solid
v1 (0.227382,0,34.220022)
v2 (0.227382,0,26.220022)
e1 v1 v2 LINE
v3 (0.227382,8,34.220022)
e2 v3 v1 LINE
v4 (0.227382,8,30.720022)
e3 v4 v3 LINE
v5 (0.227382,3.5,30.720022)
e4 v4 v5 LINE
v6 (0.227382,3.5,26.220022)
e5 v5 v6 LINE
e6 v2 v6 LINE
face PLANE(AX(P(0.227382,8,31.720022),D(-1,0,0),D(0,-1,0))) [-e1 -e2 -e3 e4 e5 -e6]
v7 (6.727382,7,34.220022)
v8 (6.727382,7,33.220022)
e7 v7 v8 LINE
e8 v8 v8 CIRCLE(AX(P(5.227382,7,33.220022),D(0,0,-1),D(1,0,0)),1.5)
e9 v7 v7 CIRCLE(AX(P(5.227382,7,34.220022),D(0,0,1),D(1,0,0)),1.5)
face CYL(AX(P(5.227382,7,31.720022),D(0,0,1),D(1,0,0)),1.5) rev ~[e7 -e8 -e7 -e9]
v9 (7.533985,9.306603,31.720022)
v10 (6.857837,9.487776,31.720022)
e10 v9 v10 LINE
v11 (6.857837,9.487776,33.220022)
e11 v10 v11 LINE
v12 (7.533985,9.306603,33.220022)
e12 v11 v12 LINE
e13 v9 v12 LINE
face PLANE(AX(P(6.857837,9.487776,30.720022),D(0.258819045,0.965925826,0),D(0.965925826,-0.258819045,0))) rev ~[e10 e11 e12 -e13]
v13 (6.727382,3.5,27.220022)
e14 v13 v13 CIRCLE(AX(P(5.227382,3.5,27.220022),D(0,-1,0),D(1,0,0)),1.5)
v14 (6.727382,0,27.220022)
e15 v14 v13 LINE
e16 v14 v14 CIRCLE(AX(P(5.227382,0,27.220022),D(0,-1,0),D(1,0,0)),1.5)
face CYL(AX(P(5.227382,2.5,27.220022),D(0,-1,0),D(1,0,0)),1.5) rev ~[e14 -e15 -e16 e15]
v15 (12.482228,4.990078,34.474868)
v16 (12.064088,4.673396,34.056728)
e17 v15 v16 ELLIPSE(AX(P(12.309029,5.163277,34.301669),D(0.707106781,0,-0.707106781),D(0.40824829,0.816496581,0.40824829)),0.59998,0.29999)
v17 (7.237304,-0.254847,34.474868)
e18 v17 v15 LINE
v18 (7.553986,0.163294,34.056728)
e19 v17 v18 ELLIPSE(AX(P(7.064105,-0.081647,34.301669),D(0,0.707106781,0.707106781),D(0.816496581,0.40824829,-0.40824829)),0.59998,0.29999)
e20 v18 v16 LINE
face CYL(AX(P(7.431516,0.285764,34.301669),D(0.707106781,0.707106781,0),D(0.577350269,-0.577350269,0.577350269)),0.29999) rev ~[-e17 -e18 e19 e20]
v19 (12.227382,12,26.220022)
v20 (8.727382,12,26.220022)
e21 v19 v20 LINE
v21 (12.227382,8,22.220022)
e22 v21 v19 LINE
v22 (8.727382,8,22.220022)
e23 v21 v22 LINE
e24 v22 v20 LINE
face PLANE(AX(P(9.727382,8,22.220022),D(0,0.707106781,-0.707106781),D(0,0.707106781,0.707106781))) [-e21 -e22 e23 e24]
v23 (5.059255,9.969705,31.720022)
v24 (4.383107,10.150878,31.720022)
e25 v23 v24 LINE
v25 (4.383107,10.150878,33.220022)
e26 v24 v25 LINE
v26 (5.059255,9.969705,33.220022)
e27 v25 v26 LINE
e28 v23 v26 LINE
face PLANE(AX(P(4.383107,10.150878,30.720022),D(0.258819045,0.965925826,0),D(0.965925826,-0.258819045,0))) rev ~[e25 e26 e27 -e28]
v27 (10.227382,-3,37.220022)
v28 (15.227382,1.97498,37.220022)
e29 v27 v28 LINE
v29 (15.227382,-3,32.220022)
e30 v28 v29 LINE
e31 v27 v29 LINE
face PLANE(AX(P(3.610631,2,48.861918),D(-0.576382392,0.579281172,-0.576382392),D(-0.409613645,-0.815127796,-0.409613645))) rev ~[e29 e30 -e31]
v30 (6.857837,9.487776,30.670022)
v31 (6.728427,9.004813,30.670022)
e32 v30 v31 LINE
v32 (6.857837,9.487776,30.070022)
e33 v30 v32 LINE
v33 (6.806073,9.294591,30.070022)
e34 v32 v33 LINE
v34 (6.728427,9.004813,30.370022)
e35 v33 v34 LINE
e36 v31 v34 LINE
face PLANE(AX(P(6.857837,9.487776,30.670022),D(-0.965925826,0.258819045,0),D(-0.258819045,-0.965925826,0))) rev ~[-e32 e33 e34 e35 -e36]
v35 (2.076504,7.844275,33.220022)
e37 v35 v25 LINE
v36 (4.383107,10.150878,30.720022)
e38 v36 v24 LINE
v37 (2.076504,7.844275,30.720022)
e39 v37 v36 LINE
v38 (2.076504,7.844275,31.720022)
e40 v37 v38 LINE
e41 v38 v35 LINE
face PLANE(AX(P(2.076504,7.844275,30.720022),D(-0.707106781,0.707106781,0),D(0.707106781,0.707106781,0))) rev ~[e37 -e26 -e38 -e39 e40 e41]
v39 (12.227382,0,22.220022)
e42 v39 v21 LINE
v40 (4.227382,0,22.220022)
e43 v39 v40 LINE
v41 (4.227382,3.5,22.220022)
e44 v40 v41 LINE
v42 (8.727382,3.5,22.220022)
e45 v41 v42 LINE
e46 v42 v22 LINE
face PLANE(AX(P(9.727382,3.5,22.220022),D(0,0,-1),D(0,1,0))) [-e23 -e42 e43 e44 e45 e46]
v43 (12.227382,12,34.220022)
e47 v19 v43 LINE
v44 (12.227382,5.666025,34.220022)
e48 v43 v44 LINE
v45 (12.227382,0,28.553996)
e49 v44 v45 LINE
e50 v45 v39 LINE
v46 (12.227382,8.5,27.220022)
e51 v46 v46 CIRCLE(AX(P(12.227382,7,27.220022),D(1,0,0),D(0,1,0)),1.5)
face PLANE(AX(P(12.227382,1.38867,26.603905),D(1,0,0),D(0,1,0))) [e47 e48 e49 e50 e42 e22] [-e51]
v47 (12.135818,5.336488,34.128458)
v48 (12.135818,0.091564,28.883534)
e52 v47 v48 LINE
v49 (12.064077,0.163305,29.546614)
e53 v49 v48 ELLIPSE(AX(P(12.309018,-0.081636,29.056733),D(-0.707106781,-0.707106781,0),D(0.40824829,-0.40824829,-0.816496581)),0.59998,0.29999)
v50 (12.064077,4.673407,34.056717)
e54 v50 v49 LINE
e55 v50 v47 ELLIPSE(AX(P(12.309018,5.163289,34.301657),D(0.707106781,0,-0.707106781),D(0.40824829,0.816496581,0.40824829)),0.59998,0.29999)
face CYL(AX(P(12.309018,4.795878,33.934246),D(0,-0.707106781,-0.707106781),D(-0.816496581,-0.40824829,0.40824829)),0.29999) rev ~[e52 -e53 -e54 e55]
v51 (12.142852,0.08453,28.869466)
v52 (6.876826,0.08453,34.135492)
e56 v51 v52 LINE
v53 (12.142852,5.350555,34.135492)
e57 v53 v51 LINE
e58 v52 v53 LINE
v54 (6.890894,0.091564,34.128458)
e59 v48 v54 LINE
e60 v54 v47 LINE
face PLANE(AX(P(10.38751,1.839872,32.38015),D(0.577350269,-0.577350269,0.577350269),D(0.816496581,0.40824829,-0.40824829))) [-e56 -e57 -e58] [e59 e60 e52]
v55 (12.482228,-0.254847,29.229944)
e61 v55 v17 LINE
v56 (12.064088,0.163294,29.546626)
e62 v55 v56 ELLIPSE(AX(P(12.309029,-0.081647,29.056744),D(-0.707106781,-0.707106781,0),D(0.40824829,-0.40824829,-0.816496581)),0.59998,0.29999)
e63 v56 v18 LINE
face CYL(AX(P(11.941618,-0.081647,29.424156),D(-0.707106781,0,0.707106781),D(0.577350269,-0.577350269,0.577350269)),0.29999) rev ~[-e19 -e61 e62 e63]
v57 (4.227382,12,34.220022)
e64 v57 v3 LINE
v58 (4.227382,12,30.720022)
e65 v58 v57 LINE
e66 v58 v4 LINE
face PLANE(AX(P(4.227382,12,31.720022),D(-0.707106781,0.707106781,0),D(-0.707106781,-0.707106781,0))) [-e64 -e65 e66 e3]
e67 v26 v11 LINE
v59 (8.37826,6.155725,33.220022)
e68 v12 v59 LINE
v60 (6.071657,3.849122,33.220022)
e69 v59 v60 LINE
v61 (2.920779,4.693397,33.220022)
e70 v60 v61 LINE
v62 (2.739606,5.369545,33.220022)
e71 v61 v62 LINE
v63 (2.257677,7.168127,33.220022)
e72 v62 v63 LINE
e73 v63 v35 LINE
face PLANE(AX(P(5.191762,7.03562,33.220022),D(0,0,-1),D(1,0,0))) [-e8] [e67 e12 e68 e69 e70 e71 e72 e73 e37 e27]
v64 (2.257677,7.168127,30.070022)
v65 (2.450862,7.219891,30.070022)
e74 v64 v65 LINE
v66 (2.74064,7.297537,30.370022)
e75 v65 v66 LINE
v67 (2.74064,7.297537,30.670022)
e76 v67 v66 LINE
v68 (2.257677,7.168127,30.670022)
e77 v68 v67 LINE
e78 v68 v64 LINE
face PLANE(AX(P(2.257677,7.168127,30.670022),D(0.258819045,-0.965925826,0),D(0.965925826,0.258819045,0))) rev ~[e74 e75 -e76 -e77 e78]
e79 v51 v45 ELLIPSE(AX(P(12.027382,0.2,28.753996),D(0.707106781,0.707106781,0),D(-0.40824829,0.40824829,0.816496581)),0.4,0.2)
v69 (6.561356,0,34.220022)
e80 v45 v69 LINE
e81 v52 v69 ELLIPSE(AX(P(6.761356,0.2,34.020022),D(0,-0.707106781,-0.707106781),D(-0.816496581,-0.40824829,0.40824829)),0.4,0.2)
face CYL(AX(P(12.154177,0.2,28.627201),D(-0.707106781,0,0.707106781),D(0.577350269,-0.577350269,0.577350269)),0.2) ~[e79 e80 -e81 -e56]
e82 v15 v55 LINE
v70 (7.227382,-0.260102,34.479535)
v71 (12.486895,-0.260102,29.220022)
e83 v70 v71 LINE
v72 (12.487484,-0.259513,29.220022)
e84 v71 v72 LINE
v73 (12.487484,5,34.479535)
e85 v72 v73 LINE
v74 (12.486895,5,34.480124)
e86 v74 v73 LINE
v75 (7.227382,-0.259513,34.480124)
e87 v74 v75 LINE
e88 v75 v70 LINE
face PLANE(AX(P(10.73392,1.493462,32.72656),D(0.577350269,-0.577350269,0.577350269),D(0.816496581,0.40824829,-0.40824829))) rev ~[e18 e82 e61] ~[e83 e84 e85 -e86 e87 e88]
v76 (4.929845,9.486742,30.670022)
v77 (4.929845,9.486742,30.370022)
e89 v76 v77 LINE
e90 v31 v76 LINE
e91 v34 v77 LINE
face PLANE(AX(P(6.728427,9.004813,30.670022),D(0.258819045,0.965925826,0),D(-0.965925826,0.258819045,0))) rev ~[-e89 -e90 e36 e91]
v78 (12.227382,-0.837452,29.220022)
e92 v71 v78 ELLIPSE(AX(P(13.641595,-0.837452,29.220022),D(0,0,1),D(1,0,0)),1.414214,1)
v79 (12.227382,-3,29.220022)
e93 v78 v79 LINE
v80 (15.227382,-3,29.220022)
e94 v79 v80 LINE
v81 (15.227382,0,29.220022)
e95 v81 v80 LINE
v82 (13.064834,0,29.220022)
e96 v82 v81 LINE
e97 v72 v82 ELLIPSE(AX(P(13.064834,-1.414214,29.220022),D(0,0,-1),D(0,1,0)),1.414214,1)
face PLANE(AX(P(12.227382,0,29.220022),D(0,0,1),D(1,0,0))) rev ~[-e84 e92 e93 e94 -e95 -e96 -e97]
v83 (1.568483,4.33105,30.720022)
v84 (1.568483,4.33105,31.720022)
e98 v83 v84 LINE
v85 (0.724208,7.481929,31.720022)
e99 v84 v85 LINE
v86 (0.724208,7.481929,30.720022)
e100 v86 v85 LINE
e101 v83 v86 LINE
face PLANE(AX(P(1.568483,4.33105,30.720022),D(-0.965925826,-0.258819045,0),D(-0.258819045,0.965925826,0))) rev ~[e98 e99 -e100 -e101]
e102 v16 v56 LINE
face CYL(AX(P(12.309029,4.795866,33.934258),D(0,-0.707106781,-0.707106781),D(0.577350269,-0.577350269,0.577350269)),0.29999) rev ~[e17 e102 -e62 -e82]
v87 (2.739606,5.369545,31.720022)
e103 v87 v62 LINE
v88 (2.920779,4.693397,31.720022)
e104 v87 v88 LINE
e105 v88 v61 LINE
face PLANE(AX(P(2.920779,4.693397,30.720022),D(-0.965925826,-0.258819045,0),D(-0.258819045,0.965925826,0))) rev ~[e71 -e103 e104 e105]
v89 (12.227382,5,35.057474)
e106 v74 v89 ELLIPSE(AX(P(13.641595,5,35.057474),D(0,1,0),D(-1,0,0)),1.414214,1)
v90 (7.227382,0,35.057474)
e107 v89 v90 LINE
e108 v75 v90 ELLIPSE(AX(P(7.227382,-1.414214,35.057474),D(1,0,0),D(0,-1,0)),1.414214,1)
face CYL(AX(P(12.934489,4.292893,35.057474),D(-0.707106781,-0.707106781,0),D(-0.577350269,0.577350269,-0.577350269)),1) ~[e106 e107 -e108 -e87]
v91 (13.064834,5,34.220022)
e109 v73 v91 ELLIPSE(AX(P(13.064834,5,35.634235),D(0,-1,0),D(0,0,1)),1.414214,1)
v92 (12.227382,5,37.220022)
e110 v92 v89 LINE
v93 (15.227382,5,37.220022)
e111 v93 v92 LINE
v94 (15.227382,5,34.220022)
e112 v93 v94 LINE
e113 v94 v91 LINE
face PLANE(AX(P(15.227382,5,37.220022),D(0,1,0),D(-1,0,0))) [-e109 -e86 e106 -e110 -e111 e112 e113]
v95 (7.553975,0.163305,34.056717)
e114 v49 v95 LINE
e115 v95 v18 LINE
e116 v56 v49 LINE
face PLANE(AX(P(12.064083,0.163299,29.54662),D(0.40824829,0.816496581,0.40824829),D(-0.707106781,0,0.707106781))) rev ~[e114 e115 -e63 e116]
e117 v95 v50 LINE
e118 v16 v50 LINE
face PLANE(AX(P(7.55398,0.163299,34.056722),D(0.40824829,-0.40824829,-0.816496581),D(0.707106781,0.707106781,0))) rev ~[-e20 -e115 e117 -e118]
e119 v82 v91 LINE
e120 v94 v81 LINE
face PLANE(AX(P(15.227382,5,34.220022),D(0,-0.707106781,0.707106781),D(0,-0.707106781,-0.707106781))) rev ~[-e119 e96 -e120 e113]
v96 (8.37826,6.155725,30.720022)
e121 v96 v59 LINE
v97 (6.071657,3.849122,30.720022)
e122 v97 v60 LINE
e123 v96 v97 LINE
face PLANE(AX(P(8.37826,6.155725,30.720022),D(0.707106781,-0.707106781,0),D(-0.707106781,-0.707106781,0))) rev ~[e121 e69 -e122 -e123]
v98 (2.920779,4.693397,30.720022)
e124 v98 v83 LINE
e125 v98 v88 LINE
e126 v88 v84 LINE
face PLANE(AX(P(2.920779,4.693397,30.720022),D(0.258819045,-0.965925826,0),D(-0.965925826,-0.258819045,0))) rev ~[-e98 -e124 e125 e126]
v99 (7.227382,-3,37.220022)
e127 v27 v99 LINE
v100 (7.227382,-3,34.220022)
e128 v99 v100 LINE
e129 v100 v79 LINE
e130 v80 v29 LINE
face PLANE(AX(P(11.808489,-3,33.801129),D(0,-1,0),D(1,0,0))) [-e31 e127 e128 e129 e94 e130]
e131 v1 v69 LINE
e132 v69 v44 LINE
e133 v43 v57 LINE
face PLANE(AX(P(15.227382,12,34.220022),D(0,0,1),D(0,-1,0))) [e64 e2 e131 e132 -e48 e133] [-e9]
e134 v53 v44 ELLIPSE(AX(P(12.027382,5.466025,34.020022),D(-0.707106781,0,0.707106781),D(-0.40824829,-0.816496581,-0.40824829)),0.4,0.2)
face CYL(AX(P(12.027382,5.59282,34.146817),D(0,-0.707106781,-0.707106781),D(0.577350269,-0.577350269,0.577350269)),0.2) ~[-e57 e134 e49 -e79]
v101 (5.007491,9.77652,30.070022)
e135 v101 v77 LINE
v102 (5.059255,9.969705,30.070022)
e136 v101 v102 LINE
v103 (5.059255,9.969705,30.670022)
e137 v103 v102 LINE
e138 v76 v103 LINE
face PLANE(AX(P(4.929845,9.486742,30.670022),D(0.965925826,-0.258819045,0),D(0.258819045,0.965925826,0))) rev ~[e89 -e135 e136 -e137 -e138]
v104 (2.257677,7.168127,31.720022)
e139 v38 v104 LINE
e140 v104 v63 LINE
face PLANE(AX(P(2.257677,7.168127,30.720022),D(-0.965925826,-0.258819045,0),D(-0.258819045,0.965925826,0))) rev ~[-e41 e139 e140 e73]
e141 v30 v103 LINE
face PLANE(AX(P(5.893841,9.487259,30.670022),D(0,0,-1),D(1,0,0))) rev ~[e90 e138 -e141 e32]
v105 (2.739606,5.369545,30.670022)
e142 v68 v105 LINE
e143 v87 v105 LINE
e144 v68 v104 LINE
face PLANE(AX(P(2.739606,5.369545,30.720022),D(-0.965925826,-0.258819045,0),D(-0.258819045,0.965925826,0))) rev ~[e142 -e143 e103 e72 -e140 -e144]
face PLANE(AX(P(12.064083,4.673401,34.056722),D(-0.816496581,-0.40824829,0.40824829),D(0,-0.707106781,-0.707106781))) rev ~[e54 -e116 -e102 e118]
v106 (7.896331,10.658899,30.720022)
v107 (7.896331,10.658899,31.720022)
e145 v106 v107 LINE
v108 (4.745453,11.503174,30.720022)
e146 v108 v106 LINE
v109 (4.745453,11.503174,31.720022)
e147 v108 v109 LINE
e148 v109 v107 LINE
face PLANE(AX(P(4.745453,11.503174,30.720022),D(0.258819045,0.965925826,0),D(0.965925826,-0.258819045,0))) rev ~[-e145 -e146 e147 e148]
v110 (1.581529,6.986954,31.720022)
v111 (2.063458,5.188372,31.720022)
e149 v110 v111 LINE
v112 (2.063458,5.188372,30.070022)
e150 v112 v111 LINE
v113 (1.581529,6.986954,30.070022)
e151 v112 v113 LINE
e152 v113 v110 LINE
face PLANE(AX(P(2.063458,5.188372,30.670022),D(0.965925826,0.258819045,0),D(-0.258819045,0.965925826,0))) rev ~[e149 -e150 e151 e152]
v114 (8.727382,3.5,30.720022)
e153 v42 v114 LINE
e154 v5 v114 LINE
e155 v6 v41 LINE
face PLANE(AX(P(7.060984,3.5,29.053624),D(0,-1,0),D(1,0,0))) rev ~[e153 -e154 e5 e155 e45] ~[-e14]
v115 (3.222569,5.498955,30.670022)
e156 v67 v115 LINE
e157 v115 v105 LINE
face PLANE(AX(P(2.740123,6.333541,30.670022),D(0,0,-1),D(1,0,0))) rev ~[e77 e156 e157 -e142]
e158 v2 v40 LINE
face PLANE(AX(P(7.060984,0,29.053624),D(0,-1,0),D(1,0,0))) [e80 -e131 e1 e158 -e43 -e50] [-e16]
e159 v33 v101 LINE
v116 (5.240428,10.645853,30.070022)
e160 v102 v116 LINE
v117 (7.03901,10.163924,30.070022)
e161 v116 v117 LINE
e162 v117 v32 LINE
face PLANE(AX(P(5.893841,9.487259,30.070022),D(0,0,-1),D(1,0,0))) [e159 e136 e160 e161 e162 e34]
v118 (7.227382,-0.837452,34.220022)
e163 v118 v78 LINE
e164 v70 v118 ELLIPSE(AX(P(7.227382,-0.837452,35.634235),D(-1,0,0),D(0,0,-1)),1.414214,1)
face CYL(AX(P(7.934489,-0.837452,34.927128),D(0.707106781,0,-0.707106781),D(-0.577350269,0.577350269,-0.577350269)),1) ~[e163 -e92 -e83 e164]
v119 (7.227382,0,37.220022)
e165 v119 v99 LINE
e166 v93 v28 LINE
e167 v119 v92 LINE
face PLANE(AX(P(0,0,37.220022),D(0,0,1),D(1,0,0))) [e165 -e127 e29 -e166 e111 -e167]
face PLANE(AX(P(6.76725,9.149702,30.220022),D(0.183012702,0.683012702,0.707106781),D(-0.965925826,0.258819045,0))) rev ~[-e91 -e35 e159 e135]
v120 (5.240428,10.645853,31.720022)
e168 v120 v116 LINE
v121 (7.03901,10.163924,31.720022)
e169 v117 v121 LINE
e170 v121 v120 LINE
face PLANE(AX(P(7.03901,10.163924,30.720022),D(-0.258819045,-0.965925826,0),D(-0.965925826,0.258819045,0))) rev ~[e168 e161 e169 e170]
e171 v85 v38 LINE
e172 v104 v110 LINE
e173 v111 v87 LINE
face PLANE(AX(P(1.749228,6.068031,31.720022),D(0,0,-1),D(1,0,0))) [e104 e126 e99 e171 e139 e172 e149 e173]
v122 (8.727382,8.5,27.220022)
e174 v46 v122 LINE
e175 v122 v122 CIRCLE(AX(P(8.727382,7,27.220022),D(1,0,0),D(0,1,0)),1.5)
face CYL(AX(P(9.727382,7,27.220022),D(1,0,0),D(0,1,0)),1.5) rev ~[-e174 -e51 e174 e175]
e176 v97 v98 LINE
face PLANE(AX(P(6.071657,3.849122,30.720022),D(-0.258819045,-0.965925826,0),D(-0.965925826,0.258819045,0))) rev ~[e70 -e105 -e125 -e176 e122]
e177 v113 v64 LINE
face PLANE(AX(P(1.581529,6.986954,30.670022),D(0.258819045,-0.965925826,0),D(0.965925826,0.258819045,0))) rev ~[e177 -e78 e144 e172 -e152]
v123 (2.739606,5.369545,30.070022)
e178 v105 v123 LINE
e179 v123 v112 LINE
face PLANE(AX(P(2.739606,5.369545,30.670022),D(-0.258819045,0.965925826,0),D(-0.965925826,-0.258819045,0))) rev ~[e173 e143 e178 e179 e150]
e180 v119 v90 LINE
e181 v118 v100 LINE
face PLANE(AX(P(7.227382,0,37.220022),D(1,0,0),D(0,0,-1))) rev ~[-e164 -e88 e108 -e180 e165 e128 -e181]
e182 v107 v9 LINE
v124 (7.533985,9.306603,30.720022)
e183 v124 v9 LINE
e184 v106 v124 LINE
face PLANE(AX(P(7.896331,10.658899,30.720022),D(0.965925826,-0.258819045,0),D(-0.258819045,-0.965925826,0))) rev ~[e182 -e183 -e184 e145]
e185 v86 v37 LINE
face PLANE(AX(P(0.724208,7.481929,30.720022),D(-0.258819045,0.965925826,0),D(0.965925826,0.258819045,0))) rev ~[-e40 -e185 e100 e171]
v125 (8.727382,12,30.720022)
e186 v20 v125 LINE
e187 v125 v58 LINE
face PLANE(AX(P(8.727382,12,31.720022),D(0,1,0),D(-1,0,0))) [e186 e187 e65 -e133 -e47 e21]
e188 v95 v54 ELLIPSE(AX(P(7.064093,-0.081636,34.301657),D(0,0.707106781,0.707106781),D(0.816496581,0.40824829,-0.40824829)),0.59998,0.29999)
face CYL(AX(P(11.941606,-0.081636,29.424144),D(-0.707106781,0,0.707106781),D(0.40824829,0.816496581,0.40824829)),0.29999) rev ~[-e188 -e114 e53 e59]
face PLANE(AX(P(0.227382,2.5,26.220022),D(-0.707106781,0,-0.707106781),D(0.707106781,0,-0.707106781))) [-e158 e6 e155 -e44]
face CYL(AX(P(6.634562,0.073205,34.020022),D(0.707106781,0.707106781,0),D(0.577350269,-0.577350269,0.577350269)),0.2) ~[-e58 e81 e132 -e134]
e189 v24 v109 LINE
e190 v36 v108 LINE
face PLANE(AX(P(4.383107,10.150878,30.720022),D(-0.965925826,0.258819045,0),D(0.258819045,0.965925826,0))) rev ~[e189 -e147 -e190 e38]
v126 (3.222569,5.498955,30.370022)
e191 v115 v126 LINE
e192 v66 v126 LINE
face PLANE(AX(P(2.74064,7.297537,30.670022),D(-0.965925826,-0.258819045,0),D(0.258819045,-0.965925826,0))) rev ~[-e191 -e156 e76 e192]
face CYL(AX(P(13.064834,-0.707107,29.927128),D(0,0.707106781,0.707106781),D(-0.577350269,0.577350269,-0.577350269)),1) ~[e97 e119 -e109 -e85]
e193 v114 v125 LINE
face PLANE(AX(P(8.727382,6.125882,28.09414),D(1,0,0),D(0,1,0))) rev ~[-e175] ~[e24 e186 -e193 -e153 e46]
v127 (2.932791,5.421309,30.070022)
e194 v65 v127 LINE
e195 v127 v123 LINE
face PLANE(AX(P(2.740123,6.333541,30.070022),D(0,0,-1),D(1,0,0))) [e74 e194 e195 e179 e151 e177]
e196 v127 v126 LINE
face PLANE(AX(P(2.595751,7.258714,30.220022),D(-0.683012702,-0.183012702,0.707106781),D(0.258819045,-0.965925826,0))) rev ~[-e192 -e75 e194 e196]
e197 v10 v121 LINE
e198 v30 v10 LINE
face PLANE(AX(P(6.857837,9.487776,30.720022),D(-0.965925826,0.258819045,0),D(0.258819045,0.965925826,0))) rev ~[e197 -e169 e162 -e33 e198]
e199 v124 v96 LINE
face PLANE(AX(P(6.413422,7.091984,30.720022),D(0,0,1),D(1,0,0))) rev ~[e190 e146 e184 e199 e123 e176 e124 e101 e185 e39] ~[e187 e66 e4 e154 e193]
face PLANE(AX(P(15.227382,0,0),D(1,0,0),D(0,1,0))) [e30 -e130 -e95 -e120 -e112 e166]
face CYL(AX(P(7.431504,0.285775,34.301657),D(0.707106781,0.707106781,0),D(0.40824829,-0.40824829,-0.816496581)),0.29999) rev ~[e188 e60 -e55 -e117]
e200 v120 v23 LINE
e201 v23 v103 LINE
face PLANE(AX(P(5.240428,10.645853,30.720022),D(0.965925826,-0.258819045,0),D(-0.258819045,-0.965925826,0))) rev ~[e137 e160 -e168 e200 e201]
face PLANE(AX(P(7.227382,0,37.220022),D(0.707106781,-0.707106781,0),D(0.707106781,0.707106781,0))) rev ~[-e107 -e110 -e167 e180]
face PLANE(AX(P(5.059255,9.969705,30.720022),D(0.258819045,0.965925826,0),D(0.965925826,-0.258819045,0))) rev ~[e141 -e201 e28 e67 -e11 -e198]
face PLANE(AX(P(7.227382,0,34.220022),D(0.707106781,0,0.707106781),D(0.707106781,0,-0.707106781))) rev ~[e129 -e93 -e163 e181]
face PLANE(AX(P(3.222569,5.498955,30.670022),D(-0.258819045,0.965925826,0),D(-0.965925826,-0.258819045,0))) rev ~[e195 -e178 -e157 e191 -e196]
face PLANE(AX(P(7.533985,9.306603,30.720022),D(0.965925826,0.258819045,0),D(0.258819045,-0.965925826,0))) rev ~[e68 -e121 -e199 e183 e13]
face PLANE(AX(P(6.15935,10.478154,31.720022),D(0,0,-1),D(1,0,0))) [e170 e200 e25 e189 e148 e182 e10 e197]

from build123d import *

# Parameters (mm, degrees)
F1_DEPTH     = 3
F0_R         = 1.5
F2_DEPTH     = 2.5
F3_R         = 1.5
F4_DEPTH     = 5.5
F5_DEPTH     = 3
F6_R         = 1.5
F7_DEPTH     = 5.5
F8_DEPTH     = 3
F10_DEPTH    = 5
F11_T4_DEPTH = 32.8926942089
F14_DEPTH    = 0.3
F15_R        = 0.29999
F16_R        = 1
F17_R        = 0.2
F18_DEPTH    = 1
F19_DEPTH    = 1
F20_DEPTH    = 1
F21_R        = 1.5
F22_DEPTH    = 2.5
F23_DEPTH    = 1
F24_DEPTH    = 0.05
F26_DEPTH    = 0.6
F27_SIZE     = 0.3


# Not quite as in the source:
# - a fillet or chamfer that OpenCascade refuses, or shapes differently, is made with other operations: its cross-section is extruded or revolved along the edge and cut away or added
# - a fillet or chamfer is up to 0.001 mm smaller than in the source, because OpenCascade refuses the exact size


with BuildPart() as f1:
    # F0 (on Front) → F1 (new body)
    with BuildSketch(Plane.XZ):
        Polygon((15.2273818341, 37.2200216049), (7.2273818341, 37.2200216049), (7.2273818341, 34.2200216049), (12.2273818341, 29.2200216049), (15.2273818341, 29.2200216049), align=None)
    extrude(amount=F1_DEPTH)

    # F0 (on Front) → F2 (join)
    with BuildSketch(Plane.XZ):
        Polygon((7.2273818341, 34.2200216049), (7.2273818341, 37.2200216049), (0.2273818341, 37.2200216049), (0.2273818341, 26.2200216049), (4.2273818341, 22.2200216049), (15.2273818341, 22.2200216049), (15.2273818341, 29.2200216049), (12.2273818341, 29.2200216049), align=None)
        with Locations((5.2273818341, 27.2200216049)):
            Circle(F0_R, mode=Mode.SUBTRACT)
        Polygon((15.2273818341, 37.2200216049), (7.2273818341, 37.2200216049), (7.2273818341, 34.2200216049), (12.2273818341, 29.2200216049), (15.2273818341, 29.2200216049), align=None)
    extrude(amount=-F2_DEPTH)

    # F3 (on face) → F4 (join)
    with BuildSketch(Plane.XY.offset(37.2200216049)):
        Polygon((0.2273818341, 2.5), (9.7273818341, 2.5), (12.2273818341, 5), (12.2273818341, 12), (4.2273818341, 12), (0.2273818341, 8), align=None)
        with Locations((5.2273818341, 7)):
            Circle(F3_R, mode=Mode.SUBTRACT)
        Polygon((9.7273818341, 2.5), (15.2273818341, 2.5), (15.2273818341, 5), (12.2273818341, 5), align=None)
    extrude(amount=-F4_DEPTH)

    # F3 (on face) → F5 (cut)
    with BuildSketch(Plane.XY.offset(37.2200216049)):
        Polygon((0.2273818341, 2.5), (9.7273818341, 2.5), (12.2273818341, 5), (12.2273818341, 12), (4.2273818341, 12), (0.2273818341, 8), align=None)
        with Locations((5.2273818341, 7)):
            Circle(F3_R, mode=Mode.SUBTRACT)
        Polygon((0.2273818341, 0), (7.2273818341, 0), (9.7273818341, 2.5), (0.2273818341, 2.5), align=None)
    extrude(amount=-F5_DEPTH, mode=Mode.SUBTRACT)

    # F6 (on face) → F7 (join)
    with BuildSketch(Plane.YZ.offset(15.2273818341)):
        Polygon((5, 34.2200216049), (0, 29.2200216049), (0, 22.2200216049), (8, 22.2200216049), (12, 26.2200216049), (12, 34.2200216049), align=None)
        with Locations((7, 27.2200216049)):
            Circle(F6_R, mode=Mode.SUBTRACT)
    extrude(amount=-F7_DEPTH)

    # F6 (on face) → F8 (cut)
    with BuildSketch(Plane.YZ.offset(15.2273818341)):
        Polygon((2.5, 31.7200216049), (0, 29.2200216049), (0, 22.2200216049), (2.5, 22.2200216049), align=None)
        Polygon((5, 31.7200216049), (2.5, 31.7200216049), (2.5, 22.2200216049), (8, 22.2200216049), (12, 26.2200216049), (12, 34.2200216049), (5, 34.2200216049), align=None)
        with Locations((7, 27.2200216049)):
            Circle(F6_R, mode=Mode.SUBTRACT)
        Polygon((5, 34.2200216049), (2.5, 31.7200216049), (5, 31.7200216049), align=None)
    extrude(amount=-F8_DEPTH, mode=Mode.SUBTRACT)

    # F9 (on face) → F10 (cut)
    with BuildSketch(Plane.XZ.offset(3)):
        Polygon((15.2273818341, 32.2200216049), (15.2273818341, 37.2200216049), (10.2273818341, 37.2200216049), align=None)
    extrude(amount=-F10_DEPTH, mode=Mode.SUBTRACT)

    # F11: chamfer of 5 x 3.5533150469 on 1 edges, made by hand


with BuildPart() as f11_tool2:
    # F11_s3 → F11_t4 (new body)
    with BuildSketch(Plane(origin=(-22.6256434487, 0, 22.6256434487), x_dir=(0, 1, 0), z_dir=(0.7071067812, 0, -0.7071067812))):
        Polygon((2, 37.1036957683), (-3, 33.5503807214), (2, 33.5503807214), align=None)
    extrude(amount=F11_T4_DEPTH)

    split(bisect_by=Plane.YZ.offset(15.2273818341), keep=Keep.BOTTOM)

    split(bisect_by=Plane.XZ.offset(3), keep=Keep.BOTTOM)

    split(bisect_by=Plane.XY.offset(37.2200216049), keep=Keep.BOTTOM)


with BuildPart() as f1_1:
    add(f1.part)

    # F11_t1: union F11_tool2
    add(f11_tool2.part)

    # F13 (on 3pt) → F14 (cut, symmetric)
    with BuildSketch(Plane(origin=(13.8158011463, -13.8158011463, 13.8158011463), x_dir=(0.8164965809, 0.4082482905, -0.4082482905), z_dir=(0.5773502692, -0.5773502692, 0.5773502692))):
        Polygon((-1.0654091424, 19.1374719877), (-1.0654091424, 29.2569466706), (-9.8291312908, 24.1972093292), align=None)
        Polygon((-1.9454084062, 20.6616754232), (-8.0691327632, 24.1972093292), (-1.9454084062, 27.7327432351), align=None, mode=Mode.SUBTRACT)
        Polygon((-1.9454084062, 27.7327432351), (-8.0691327632, 24.1972093292), (-1.9454084062, 20.6616754232), align=None)
        Polygon((-7.6691327632, 24.1972093292), (-2.1454084062, 27.3863330736), (-2.1454084062, 21.0080855847), align=None, mode=Mode.SUBTRACT)
    extrude(amount=F14_DEPTH, both=True, mode=Mode.SUBTRACT)

    # F15 (radius 0.3 in the source; OpenCascade refuses exactly that, so slightly less here)
    f15_edges = [f1_1.edges().sort_by_distance(p)[0] for p in [
        (9.635826, 2.591555, 33.883517),
        (11.890877, 2.591555, 31.628466),
        (9.982237, 2.245145, 34.229927),
        (12.237288, 2.245145, 31.974876),
        (9.635826, 0.336504, 31.628466),
        (9.982237, -0.009906, 31.974876),
    ]]
    fillet(f15_edges, radius=F15_R)

    # F16
    f16_edges = [f1_1.edges().sort_by_distance(p)[0] for p in [
        (12.746997, 2.5, 31.720022),
        (9.727382, -0.519615, 31.720022),
        (9.727382, 2.5, 34.739637),
    ]]
    fillet(f16_edges, radius=F16_R)

    # F17
    f17_edges = [f1_1.edges().sort_by_distance(p)[0] for p in [
        (9.467574, 0, 31.460214),
        (12.227382, 2.759808, 31.460214),
        (9.467574, 2.759808, 34.220022),
    ]]
    fillet(f17_edges, radius=F17_R)

    # F18 (add): a face of the model
    f18_faces = [f1_1.faces().sort_by_distance(p)[0] for p in [
        (4.9773818341, 2.5, 31.5856713165),
    ]]
    extrude(f18_faces, amount=F18_DEPTH)

    # F19 (add): a face of the model
    f19_faces = [f1_1.faces().sort_by_distance(p)[0] for p in [
        (9.7273818341, 7.75, 31.592546117),
    ]]
    extrude(f19_faces, amount=F19_DEPTH)

    # F20 (add): a face of the model
    f20_faces = [f1_1.faces().sort_by_distance(p)[0] for p in [
        (4.4773818341, 3.6202081528, 31.7200216049),
    ]]
    extrude(f20_faces, amount=F20_DEPTH)

    # F21 (on face) → F22 (cut)
    with BuildSketch(Plane(origin=(0, 0, 30.7200216049), x_dir=(1, 0, 0), z_dir=(0, 0, -1))):
        Polygon((2.0765037567, -7.8442752363), (4.3831065978, -10.1508780774), (5.0592546763, -9.9697047458), (4.9816089627, -9.679926998), (6.7801908833, -9.1979984248), (6.8578365969, -9.4877761727), (7.5339846753, -9.3066028411), (8.3782599116, -6.1557247637), (6.0716570704, -3.8491219226), (2.920778993, -4.6933971589), (2.7396056614, -5.3695452373), (3.0293834093, -5.4471909508), (2.5474548362, -7.2457728714), (2.2576770883, -7.1681271579), align=None)
        with Locations((5.2273818341, -7)):
            Circle(F21_R, mode=Mode.SUBTRACT)
        Polygon((2.7396056614, -5.3695452373), (2.2576770883, -7.1681271579), (2.5474548362, -7.2457728714), (3.0293834093, -5.4471909508), align=None)
        Polygon((4.9816089627, -9.679926998), (5.0592546763, -9.9697047458), (6.8578365969, -9.4877761727), (6.7801908833, -9.1979984248), align=None)
    extrude(amount=-F22_DEPTH, mode=Mode.SUBTRACT)

    # F21 (on face) → F23 (cut)
    with BuildSketch(Plane(origin=(0, 0, 30.7200216049), x_dir=(1, 0, 0), z_dir=(0, 0, -1))):
        Polygon((0.7242075999, -7.4819285731), (2.0765037567, -7.8442752363), (2.2576770883, -7.1681271579), (1.5815290099, -6.9869538263), (2.063457583, -5.1883719057), (2.7396056614, -5.3695452373), (2.920778993, -4.6933971589), (1.5684828362, -4.3310504957), align=None)
        Polygon((5.0592546763, -9.9697047458), (4.3831065978, -10.1508780774), (4.745453261, -11.5031742342), (7.8963313384, -10.6588989979), (7.5339846753, -9.3066028411), (6.8578365969, -9.4877761727), (7.0390099284, -10.1639242511), (5.2404280078, -10.6458528242), align=None)
    extrude(amount=-F23_DEPTH, mode=Mode.SUBTRACT)

    # F21 (on face) → F24 (join, symmetric)
    with BuildSketch(Plane(origin=(0, 0, 30.7200216049), x_dir=(1, 0, 0), z_dir=(0, 0, -1))):
        Polygon((1.5815290099, -6.9869538263), (2.2576770883, -7.1681271579), (2.7396056614, -5.3695452373), (2.063457583, -5.1883719057), align=None)
        Polygon((6.8578365969, -9.4877761727), (5.0592546763, -9.9697047458), (5.2404280078, -10.6458528242), (7.0390099284, -10.1639242511), align=None)
    extrude(amount=F24_DEPTH, both=True)

    # F25 (on face) → F26 (join)
    with BuildSketch(Plane(origin=(0, 0, 30.6700216049), x_dir=(1, 0, 0), z_dir=(0, 0, -1))):
        Polygon((2.7396056614, -5.3695452373), (2.2576770883, -7.1681271579), (2.7406400014, -7.2975366804), (3.2225685746, -5.4989547598), align=None)
        Polygon((1.5815290099, -6.9869538263), (2.2576770883, -7.1681271579), (2.7396056614, -5.3695452373), (2.063457583, -5.1883719057), align=None)
        Polygon((4.9298451537, -9.4867418327), (5.0592546763, -9.9697047458), (6.8578365969, -9.4877761727), (6.7284270743, -9.0048132595), align=None)
        Polygon((5.0592546763, -9.9697047458), (5.2404280078, -10.6458528242), (7.0390099284, -10.1639242511), (6.8578365969, -9.4877761727), align=None)
    extrude(amount=F26_DEPTH)

    # F27
    f27_edges = [f1_1.edges().sort_by_distance(p)[0] for p in [
        (2.981604, 6.398246, 30.070022),
        (5.829136, 9.245778, 30.070022),
    ]]
    chamfer(f27_edges, length=F27_SIZE)


solid = f1_1.part
